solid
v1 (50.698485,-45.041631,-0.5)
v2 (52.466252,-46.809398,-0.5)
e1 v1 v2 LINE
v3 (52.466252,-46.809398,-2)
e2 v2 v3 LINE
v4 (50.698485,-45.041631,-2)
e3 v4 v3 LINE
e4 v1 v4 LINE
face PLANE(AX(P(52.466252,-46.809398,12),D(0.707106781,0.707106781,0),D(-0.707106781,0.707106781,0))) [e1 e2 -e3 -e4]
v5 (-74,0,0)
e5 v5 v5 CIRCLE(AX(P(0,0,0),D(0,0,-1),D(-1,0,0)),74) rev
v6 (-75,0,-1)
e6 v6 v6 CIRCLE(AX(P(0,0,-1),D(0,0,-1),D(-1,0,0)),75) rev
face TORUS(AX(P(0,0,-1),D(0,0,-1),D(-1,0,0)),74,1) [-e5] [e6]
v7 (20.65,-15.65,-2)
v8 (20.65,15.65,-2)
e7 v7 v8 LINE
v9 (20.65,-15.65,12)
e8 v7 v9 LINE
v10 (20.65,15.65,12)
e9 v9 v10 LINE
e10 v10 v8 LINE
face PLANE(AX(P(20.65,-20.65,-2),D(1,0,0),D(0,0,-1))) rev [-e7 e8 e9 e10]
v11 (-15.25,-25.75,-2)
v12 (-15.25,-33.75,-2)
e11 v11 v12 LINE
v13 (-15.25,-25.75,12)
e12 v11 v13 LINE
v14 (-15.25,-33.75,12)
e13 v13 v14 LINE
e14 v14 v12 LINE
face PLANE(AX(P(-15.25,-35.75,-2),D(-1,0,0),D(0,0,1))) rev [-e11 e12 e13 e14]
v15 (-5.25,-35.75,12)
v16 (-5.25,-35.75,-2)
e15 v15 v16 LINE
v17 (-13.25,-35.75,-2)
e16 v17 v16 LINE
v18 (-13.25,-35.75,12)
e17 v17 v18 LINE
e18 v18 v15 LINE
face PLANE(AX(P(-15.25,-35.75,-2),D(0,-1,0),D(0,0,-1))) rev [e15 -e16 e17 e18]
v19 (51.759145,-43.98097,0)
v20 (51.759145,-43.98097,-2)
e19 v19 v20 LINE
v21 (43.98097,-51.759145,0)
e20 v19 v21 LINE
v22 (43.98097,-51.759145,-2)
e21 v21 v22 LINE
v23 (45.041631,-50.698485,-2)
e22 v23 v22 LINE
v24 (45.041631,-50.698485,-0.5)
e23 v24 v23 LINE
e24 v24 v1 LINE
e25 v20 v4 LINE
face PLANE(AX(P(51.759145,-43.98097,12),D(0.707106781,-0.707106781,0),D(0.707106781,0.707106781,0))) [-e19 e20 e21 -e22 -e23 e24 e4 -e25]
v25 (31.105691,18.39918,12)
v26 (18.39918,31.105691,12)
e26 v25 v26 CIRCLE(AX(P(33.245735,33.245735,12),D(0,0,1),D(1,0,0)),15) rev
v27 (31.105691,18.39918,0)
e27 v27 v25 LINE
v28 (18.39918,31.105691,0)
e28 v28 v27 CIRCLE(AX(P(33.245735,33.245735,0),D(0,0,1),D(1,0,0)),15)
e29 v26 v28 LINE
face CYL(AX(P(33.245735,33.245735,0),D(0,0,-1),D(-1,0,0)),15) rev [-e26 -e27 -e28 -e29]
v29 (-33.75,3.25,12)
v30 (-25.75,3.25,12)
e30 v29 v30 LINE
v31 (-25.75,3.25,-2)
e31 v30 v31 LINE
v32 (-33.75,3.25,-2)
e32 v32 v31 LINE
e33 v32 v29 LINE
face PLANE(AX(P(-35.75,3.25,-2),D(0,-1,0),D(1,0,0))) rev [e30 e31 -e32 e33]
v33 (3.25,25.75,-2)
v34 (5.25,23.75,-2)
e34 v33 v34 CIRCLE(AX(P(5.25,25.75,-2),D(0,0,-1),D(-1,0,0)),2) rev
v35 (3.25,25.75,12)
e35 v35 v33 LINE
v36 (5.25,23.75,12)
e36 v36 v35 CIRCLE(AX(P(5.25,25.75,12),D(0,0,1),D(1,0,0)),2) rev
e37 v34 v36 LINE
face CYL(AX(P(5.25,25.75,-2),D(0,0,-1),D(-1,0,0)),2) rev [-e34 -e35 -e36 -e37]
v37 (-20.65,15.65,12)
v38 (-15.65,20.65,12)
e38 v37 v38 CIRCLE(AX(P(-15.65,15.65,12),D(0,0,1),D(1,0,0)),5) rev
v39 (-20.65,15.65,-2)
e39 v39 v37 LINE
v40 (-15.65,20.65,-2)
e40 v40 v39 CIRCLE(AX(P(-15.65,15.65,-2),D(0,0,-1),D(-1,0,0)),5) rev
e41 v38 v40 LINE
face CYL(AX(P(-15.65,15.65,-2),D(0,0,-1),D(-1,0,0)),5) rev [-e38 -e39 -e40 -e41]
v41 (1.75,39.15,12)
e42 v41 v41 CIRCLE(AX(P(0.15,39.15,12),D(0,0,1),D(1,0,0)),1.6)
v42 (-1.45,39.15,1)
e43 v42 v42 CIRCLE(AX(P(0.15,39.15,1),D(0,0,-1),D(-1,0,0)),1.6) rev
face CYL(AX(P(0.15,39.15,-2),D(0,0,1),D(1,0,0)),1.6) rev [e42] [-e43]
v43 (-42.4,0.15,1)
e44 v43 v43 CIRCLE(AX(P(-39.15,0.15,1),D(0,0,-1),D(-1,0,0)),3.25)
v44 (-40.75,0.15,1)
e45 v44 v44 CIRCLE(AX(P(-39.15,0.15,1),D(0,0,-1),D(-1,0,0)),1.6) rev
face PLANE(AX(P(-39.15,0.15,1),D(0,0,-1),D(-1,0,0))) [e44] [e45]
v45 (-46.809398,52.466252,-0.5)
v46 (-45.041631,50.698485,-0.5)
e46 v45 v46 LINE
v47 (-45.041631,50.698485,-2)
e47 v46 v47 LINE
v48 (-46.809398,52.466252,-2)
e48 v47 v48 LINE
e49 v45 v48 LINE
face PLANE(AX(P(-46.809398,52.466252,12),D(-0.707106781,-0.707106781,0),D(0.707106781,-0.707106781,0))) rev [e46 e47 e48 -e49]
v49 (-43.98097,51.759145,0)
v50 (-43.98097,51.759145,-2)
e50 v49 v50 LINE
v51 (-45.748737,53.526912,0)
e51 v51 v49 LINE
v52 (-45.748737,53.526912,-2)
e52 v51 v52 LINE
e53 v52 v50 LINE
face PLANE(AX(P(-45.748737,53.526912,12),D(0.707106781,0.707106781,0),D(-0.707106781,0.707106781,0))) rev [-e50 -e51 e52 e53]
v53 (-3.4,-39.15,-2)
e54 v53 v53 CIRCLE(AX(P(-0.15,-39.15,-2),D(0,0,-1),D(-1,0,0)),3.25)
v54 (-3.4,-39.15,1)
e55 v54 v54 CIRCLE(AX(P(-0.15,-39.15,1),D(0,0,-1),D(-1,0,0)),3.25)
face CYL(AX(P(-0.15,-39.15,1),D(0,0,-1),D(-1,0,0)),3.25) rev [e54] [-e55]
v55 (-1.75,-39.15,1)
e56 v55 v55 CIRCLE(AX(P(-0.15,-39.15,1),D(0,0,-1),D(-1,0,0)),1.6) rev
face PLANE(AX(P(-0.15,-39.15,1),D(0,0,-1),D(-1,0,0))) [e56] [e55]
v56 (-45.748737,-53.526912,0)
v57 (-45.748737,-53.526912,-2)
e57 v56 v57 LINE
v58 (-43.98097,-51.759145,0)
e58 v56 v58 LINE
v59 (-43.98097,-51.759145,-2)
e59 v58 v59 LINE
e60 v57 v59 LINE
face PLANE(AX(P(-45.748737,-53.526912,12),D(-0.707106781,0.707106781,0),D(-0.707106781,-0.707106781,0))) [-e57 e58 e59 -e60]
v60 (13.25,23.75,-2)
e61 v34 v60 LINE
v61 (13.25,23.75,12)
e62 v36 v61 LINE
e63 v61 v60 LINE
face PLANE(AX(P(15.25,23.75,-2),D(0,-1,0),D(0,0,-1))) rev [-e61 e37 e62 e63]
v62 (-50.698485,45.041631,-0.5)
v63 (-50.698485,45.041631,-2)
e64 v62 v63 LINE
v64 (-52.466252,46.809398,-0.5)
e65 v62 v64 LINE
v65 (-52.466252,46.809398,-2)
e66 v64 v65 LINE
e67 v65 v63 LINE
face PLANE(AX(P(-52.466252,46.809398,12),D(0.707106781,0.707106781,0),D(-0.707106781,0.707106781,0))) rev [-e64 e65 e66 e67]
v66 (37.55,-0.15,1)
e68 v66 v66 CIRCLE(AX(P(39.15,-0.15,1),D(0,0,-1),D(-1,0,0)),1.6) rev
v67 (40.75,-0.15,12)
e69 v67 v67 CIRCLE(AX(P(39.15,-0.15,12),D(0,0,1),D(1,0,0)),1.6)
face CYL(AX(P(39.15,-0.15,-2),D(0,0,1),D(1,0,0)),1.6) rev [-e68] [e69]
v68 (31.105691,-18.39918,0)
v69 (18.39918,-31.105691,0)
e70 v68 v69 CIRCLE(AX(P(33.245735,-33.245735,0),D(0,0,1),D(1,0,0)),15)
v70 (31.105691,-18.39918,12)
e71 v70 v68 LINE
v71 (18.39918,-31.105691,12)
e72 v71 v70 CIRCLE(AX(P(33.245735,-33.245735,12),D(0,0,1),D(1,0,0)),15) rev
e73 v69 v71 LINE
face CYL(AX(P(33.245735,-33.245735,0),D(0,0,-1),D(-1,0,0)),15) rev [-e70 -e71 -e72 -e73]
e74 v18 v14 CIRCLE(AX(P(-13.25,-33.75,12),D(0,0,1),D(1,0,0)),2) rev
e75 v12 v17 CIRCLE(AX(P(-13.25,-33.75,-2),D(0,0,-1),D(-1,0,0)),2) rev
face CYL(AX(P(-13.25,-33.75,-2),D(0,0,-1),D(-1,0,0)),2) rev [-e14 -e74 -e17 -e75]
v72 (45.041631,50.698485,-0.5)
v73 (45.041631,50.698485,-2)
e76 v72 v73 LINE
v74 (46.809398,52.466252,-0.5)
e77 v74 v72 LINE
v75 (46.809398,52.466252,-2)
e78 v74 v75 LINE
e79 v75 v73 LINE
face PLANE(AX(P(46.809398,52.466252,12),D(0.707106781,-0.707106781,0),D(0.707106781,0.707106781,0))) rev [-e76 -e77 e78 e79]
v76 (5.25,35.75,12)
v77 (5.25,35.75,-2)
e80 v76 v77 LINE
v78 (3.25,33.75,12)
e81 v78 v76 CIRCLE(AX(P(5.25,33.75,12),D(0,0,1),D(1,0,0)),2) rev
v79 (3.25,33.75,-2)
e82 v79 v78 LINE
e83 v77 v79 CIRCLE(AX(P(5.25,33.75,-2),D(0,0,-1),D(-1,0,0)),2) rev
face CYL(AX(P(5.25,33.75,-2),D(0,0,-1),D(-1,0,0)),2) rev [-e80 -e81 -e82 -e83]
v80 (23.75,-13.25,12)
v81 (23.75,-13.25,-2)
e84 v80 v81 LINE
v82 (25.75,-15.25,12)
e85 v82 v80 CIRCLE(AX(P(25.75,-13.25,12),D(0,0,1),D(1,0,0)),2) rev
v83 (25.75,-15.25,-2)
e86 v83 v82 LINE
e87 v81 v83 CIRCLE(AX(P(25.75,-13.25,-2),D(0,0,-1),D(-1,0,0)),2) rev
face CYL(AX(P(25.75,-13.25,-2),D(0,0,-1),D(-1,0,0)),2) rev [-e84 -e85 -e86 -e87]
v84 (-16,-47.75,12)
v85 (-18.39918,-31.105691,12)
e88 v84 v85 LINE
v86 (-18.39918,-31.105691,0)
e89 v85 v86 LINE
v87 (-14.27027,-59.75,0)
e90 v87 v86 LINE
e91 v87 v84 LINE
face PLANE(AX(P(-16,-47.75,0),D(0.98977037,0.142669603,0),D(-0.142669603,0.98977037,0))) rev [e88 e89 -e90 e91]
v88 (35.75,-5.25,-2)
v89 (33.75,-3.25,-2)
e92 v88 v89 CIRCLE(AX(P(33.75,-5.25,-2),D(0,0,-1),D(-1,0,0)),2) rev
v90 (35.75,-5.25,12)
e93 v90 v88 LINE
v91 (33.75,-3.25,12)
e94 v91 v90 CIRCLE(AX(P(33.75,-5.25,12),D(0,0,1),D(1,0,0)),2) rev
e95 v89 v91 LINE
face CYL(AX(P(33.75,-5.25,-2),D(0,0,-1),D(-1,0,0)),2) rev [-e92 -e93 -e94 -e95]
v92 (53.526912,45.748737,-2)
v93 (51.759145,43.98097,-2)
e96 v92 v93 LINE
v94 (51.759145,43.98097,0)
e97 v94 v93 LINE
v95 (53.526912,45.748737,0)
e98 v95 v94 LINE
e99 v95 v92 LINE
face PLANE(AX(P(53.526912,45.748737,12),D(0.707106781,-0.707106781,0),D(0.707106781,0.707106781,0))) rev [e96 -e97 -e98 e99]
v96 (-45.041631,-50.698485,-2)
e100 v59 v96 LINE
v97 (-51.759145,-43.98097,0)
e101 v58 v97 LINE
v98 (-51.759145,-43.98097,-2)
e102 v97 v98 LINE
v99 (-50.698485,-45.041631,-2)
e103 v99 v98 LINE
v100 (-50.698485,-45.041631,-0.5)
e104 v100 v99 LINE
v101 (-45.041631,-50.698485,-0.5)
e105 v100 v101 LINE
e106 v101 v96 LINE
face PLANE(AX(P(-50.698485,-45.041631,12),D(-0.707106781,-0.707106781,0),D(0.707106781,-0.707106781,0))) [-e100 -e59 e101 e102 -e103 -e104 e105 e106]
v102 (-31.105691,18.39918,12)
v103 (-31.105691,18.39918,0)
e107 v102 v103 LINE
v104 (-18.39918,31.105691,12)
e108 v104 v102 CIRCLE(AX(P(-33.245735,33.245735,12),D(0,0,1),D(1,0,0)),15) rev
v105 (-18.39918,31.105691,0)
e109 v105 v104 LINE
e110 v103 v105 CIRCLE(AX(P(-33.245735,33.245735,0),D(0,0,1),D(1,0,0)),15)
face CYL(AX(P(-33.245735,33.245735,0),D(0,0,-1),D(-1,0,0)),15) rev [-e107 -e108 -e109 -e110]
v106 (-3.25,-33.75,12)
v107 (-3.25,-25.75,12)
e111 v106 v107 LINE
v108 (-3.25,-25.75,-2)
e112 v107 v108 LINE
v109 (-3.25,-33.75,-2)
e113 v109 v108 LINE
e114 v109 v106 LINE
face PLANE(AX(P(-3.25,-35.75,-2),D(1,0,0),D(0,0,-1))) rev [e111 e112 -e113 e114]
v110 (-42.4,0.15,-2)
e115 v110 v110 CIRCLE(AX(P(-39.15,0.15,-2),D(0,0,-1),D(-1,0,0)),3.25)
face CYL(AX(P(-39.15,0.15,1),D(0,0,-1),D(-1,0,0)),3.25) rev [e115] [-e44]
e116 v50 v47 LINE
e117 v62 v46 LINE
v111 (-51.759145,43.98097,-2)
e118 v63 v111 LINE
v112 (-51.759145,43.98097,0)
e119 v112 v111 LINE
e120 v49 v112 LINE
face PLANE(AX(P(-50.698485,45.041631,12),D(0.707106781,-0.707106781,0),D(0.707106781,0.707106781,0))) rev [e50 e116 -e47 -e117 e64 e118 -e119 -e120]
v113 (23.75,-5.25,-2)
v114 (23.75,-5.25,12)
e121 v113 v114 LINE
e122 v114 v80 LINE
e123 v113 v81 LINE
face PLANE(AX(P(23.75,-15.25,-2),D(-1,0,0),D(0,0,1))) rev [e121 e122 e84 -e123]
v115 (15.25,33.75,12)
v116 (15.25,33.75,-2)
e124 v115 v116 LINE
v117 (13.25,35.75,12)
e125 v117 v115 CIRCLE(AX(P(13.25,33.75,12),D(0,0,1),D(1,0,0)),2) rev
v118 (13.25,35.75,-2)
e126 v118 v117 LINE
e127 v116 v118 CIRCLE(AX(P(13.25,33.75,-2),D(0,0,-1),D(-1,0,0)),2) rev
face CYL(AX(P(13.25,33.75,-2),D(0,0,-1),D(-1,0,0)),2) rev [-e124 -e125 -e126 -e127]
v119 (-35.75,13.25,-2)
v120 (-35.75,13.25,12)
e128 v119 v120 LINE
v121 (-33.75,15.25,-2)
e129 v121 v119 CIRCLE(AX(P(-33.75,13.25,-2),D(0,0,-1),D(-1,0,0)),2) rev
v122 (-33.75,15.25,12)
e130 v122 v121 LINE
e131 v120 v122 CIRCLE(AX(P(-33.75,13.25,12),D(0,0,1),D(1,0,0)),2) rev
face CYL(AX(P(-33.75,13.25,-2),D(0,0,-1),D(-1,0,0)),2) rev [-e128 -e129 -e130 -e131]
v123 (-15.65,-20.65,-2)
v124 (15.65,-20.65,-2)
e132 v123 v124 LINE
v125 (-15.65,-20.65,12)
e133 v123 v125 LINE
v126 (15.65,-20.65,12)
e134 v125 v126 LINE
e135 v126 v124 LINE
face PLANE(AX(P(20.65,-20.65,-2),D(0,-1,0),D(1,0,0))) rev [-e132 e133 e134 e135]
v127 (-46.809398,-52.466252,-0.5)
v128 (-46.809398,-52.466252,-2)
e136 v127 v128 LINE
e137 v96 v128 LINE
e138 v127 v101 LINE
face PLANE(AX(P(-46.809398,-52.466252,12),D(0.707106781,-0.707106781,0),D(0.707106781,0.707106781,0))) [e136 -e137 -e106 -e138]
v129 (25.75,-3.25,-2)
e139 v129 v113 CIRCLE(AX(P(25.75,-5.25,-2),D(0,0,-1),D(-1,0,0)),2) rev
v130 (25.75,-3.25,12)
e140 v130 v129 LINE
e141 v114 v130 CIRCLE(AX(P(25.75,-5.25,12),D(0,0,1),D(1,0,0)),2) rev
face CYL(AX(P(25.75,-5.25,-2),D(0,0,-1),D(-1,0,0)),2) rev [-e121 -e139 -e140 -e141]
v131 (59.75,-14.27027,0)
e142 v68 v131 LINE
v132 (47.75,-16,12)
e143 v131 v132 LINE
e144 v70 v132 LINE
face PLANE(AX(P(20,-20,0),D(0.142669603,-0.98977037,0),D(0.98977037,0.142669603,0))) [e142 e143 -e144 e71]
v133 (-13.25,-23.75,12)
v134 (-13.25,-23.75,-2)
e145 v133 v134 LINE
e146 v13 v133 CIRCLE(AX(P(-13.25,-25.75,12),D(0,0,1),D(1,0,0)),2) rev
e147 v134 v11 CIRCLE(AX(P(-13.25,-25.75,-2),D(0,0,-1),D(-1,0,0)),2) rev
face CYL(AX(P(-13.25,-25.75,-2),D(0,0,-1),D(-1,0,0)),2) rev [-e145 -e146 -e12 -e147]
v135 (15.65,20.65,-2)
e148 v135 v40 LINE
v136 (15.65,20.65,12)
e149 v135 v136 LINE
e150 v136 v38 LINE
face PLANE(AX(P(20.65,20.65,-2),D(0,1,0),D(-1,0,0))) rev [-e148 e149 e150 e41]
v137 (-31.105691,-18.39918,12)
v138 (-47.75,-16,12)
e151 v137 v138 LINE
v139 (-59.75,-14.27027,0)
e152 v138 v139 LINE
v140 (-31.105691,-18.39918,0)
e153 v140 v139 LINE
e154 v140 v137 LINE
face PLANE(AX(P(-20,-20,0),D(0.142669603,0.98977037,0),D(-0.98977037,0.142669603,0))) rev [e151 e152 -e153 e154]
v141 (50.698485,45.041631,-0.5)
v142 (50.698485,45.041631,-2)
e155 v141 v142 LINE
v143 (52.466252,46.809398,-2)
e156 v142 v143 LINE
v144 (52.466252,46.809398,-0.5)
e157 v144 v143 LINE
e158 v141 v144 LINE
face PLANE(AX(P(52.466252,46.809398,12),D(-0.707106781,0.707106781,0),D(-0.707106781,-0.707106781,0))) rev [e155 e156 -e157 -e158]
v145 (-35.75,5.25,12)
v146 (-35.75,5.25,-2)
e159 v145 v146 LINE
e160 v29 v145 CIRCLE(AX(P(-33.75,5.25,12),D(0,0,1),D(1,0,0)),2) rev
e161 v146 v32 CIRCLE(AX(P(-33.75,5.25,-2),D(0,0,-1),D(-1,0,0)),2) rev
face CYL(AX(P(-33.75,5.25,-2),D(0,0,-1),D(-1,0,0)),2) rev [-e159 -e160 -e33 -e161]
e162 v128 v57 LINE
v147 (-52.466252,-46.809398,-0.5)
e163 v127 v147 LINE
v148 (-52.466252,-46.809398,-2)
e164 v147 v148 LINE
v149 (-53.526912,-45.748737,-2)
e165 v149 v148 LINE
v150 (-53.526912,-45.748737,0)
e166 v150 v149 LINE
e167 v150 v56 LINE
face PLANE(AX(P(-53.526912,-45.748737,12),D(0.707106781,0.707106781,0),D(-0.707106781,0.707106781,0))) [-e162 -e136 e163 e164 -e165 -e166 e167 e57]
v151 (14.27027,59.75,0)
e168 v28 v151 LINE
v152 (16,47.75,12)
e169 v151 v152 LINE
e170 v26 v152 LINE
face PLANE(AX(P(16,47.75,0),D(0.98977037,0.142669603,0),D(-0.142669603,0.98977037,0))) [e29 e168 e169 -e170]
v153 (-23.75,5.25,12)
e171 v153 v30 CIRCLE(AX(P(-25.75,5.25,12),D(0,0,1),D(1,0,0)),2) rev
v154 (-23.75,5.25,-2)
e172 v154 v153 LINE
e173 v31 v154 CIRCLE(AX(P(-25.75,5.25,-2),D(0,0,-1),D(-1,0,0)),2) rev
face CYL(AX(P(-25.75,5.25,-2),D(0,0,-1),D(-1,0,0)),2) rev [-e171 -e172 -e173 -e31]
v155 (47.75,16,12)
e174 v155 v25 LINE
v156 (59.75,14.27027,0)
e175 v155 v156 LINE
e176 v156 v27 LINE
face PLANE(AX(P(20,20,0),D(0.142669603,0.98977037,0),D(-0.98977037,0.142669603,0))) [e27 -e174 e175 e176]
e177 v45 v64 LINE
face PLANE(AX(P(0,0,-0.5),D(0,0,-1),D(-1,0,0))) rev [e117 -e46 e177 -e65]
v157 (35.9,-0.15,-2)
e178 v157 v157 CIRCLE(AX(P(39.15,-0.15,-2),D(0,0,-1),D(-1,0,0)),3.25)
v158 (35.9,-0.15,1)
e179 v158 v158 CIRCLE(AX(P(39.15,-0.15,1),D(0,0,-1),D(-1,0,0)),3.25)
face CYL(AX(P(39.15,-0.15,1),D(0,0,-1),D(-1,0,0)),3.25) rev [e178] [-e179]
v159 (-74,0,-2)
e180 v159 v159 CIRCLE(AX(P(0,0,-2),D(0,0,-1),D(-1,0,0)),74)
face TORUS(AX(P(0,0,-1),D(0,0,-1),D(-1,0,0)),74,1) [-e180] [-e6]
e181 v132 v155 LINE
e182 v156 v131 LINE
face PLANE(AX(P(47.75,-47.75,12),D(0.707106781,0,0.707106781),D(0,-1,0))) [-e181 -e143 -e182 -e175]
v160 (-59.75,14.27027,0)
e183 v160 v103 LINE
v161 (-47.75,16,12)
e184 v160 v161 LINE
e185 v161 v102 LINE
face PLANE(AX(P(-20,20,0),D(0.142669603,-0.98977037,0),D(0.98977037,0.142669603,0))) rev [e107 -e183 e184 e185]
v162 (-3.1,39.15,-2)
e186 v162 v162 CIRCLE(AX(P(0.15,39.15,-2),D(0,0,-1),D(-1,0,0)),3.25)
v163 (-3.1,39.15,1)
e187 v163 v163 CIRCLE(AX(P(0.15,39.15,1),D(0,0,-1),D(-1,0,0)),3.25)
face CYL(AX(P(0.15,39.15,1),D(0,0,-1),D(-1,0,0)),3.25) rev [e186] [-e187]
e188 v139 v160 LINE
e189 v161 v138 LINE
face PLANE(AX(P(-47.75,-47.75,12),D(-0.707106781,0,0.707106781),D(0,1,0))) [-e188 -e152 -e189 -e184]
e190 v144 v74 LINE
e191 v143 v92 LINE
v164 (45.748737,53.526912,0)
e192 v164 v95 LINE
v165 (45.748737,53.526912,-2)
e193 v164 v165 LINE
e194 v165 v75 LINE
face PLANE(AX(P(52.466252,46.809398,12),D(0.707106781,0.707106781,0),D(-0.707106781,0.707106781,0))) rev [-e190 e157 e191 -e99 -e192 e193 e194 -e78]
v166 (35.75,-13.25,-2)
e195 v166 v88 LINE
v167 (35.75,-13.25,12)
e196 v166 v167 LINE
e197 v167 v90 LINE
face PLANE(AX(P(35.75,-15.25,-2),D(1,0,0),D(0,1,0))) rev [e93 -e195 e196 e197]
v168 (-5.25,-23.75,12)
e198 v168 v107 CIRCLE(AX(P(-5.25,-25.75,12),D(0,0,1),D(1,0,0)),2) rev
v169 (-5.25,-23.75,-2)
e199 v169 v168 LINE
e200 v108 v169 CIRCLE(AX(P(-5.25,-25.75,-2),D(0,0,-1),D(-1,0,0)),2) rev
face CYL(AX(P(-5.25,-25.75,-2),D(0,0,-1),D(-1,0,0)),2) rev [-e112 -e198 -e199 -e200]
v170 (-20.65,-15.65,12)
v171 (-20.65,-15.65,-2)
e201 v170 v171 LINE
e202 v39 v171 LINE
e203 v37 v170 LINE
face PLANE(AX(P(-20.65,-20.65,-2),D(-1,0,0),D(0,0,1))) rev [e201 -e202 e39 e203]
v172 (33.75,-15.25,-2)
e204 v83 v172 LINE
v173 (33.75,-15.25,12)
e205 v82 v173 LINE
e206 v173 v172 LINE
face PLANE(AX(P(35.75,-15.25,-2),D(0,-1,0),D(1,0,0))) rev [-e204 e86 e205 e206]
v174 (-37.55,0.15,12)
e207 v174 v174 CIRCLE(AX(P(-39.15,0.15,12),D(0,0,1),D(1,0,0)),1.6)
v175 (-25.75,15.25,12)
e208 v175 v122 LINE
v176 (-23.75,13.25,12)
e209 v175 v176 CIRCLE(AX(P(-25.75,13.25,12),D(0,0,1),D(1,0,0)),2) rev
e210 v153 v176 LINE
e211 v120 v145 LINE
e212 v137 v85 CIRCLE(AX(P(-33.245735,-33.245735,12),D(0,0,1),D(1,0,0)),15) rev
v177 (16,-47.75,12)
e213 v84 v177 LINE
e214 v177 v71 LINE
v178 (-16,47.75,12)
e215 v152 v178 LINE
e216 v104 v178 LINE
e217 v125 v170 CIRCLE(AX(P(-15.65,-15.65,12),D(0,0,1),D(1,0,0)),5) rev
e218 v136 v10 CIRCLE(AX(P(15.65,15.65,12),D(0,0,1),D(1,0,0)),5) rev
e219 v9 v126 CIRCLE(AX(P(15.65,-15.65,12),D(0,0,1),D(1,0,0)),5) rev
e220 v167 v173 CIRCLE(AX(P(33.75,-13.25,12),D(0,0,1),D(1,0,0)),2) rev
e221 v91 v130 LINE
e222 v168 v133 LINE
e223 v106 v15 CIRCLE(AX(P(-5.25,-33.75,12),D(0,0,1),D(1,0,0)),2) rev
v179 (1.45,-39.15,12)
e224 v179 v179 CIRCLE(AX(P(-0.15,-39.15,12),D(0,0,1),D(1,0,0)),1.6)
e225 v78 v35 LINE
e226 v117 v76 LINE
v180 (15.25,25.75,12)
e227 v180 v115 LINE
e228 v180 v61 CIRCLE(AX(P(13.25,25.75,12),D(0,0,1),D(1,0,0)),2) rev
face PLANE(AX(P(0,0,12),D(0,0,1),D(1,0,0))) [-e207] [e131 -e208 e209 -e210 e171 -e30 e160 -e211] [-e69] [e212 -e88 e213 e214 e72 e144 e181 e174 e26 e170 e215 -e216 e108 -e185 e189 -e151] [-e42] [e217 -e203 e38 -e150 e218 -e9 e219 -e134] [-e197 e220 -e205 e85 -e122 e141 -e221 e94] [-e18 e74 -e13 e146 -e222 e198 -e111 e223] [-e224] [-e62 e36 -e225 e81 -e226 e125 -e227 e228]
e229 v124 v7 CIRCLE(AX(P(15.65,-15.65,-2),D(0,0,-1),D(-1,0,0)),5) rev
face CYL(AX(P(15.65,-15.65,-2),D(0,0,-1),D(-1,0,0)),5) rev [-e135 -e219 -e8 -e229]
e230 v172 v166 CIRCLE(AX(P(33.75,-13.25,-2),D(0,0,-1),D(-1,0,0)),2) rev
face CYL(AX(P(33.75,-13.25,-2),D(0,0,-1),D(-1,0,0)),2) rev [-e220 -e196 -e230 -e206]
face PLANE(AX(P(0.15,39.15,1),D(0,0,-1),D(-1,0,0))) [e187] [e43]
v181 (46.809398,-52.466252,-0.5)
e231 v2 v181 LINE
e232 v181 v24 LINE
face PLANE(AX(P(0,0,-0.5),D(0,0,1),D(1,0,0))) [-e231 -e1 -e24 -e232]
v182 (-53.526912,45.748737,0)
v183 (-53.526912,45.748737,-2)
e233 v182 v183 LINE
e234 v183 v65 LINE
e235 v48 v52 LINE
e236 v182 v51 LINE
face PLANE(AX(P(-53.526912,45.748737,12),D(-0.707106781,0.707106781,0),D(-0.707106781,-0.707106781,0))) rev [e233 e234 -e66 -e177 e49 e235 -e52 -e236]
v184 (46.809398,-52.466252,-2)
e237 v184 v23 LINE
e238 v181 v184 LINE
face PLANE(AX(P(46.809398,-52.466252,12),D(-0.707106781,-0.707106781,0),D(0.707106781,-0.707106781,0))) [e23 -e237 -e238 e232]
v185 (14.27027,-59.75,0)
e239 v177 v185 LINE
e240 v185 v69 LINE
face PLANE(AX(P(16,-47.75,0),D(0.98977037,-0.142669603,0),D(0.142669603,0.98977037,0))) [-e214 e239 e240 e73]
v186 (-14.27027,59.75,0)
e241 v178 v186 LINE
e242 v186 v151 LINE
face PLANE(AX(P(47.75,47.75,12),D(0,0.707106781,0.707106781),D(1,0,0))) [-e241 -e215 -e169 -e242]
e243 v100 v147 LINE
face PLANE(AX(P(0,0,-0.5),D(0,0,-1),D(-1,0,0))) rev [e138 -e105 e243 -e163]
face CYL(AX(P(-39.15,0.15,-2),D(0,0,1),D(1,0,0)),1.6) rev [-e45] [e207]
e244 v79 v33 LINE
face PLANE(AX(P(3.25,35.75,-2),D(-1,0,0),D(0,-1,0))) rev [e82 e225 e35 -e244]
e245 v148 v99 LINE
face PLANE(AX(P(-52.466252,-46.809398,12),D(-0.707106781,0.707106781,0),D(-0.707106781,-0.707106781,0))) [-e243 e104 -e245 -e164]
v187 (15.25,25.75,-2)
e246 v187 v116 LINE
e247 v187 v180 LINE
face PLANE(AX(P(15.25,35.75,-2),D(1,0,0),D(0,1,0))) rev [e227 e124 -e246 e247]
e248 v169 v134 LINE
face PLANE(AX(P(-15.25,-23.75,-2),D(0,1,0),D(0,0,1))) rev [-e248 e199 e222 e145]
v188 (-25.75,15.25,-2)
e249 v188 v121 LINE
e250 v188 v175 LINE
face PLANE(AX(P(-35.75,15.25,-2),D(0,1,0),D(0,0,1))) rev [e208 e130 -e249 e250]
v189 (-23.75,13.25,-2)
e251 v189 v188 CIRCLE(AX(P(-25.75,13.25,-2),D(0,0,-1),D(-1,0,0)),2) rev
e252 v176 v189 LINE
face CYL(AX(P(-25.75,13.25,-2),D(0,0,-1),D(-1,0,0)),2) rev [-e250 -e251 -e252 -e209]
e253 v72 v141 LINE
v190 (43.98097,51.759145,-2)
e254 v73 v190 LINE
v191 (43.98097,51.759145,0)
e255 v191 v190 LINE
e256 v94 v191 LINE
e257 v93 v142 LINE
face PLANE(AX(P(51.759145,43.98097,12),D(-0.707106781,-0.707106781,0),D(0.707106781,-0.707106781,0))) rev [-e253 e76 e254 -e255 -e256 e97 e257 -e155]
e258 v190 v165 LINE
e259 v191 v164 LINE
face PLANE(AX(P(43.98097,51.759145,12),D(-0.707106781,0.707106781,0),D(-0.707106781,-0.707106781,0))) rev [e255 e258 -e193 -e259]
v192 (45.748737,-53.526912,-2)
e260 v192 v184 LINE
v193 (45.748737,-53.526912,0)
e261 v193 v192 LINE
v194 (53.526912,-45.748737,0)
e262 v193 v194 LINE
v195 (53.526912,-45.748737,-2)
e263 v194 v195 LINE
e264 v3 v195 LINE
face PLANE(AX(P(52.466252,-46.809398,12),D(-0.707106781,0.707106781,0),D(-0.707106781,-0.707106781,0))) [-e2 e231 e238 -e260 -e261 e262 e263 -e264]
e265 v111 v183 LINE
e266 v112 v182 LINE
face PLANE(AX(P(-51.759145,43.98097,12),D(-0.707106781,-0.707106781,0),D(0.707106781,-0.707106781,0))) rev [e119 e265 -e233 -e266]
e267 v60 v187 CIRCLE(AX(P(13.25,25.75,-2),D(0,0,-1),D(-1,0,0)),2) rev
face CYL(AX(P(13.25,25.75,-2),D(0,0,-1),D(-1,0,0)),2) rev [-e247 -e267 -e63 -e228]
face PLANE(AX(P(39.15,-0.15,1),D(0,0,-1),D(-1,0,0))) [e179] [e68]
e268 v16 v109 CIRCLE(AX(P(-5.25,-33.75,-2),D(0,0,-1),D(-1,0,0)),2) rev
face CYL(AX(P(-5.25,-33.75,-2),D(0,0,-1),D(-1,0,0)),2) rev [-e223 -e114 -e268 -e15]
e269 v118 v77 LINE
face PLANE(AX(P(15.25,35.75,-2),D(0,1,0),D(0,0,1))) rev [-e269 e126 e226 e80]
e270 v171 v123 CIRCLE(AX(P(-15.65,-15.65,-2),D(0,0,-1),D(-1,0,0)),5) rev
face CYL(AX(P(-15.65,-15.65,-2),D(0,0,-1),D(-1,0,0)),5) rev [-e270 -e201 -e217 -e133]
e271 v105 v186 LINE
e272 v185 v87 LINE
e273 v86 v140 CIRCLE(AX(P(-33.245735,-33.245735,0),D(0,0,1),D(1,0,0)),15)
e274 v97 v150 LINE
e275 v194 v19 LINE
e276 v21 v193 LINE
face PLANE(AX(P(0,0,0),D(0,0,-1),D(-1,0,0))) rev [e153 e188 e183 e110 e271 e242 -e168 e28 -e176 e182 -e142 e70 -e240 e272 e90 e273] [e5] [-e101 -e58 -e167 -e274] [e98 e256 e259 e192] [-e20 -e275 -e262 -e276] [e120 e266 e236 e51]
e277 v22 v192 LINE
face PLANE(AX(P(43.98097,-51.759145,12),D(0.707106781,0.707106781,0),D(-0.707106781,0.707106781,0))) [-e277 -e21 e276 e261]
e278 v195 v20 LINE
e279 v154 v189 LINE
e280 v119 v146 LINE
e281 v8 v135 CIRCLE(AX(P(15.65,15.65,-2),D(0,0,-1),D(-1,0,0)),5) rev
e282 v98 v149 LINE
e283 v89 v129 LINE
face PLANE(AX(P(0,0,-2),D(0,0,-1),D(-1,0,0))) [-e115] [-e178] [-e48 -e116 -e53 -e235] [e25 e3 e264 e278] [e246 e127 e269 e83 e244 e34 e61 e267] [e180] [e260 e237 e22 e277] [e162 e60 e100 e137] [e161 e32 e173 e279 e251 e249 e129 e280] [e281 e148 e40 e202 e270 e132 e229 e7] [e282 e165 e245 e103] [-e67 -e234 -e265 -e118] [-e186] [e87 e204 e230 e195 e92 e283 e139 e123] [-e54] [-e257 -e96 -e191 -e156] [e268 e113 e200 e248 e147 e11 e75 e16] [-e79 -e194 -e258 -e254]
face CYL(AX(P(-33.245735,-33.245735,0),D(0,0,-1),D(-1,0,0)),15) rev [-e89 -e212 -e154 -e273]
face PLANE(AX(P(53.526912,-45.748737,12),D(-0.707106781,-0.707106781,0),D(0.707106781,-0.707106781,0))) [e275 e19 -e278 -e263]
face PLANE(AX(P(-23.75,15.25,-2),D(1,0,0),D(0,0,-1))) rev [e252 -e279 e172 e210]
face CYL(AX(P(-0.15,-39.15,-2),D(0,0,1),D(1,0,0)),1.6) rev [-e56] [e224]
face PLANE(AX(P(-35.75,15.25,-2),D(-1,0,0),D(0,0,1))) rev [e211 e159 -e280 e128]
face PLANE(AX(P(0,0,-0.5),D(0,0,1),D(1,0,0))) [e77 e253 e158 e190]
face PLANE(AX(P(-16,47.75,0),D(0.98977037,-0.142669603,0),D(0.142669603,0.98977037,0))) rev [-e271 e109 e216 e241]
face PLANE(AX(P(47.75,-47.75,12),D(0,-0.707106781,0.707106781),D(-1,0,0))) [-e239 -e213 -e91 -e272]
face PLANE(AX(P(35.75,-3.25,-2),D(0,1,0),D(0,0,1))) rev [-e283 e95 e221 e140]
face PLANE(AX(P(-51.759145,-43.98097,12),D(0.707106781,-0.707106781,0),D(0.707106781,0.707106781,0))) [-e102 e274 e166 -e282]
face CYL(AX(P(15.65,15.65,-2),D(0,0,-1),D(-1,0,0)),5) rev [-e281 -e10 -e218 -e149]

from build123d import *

# Parameters (mm, degrees)
SKETCH_1_W          = 95.5
SKETCH_1_H          = 95.5
EXTRUDE_1_DEPTH     = 12
CUT_EXTRUDE_1_DEPTH = 69.58662406
FILLET_2_R          = 15
SKETCH_3_R          = 75
EXTRUDE_2_DEPTH     = 2
CHAMFER_1_SIZE      = 12
FILLET_1_R          = 1
SKETCH_6_W          = 42
SKETCH_6_H          = 42
CUT_EXTRUDE_3_DEPTH = 107.98598046
SKETCH_7_R          = 1.6
CUT_EXTRUDE_4_DEPTH = 107.98598046
CUT_EXTRUDE_5_DEPTH = 107.98598046
CUT_EXTRUDE_6_DEPTH = 0.5
SKETCH_10_W         = 12
SKETCH_10_H         = 12
CUT_EXTRUDE_7_DEPTH = 107.98598046
SKETCH_11_W         = 42
SKETCH_11_H         = 42
EXTRUDE_3_DEPTH     = 14
FILLET_3_R          = 2
SKETCH_12_W         = 41.3
SKETCH_12_H         = 41.3
CUT_EXTRUDE_8_DEPTH = 107.98598046
FILLET_4_R          = 5
SKETCH_13_R         = 3.25
CUT_EXTRUDE_9_DEPTH = 3


with BuildPart() as part:
    # ｽｹｯﾁ1 → ﾎﾞｽ - 押し出し1 (new body)
    with BuildSketch(Plane.XY):
        Rectangle(SKETCH_1_W, SKETCH_1_H)
    extrude(amount=EXTRUDE_1_DEPTH)

    # ｽｹｯﾁ2 → ｶｯﾄ - 押し出し1 (cut, through all)
    with BuildSketch(Plane.XY.offset(12)):
        Polygon((-16, 47.75), (-20, 20), (-47.75, 16), (-47.75, 47.75), align=None)
        Polygon((-16, -47.75), (-20, -20), (-47.75, -16), (-47.75, -47.75), align=None)
    cut_extrude_1 = extrude(amount=-CUT_EXTRUDE_1_DEPTH, mode=Mode.SUBTRACT)

    # ﾐﾗｰ1: ｶｯﾄ - 押し出し1 across plane
    add(cut_extrude_1.mirror(Plane(origin=(0, 0, 0), x_dir=(0, 0, 1), z_dir=(1, 0, 0))), mode=Mode.SUBTRACT)

    # ﾌｨﾚｯﾄ2
    fillet_2_edges = [part.edges().sort_by_distance(p)[0] for p in [
        (-20, 20, 6),
        (-20, -20, 6),
        (20, 20, 6),
        (20, -20, 6),
    ]]
    fillet(fillet_2_edges, radius=FILLET_2_R)

    # ｽｹｯﾁ3 → ﾎﾞｽ - 押し出し2 (add)
    with BuildSketch(Plane(origin=(0, 0, 0), x_dir=(-1, 0, 0), z_dir=(0, 0, -1))):
        Circle(SKETCH_3_R)
    extrude(amount=EXTRUDE_2_DEPTH)

    # 面取り1
    chamfer_1_edges = [part.edges().sort_by_distance(p)[0] for p in [
        (0, 47.75, 0),
        (47.75, 0, 0),
        (0, -47.75, 0),
        (-47.75, 0, 0),
    ]]
    chamfer(chamfer_1_edges, length=CHAMFER_1_SIZE - 0.0001)  # a hair under: the kernel refuses the full size

    # ﾌｨﾚｯﾄ1
    fillet_1_edges = [part.edges().sort_by_distance(p)[0] for p in [
        (75, 0, 0),
        (75, 0, -2),
    ]]
    fillet(fillet_1_edges, radius=FILLET_1_R - 0.0001)  # a hair under: the kernel refuses the full size

    # ｽｹｯﾁ6 → ｶｯﾄ - 押し出し3 (cut, through all)
    with BuildSketch(Plane.XY.offset(12)):
        Rectangle(SKETCH_6_W, SKETCH_6_H)
    extrude(amount=-CUT_EXTRUDE_3_DEPTH, mode=Mode.SUBTRACT)

    # ｽｹｯﾁ7 → ｶｯﾄ - 押し出し4 (cut, through all)
    with BuildSketch(Plane.XY.offset(12)):
        with Locations((0.15, 39.15)):
            Circle(SKETCH_7_R)
        with Locations((-39.15, 0.15)):
            Circle(SKETCH_7_R)
        with Locations((39.15, -0.15)):
            Circle(SKETCH_7_R)
        with Locations((-0.15, -39.15)):
            Circle(SKETCH_7_R)
    extrude(amount=-CUT_EXTRUDE_4_DEPTH, mode=Mode.SUBTRACT)

    # ｽｹｯﾁ8 → ｶｯﾄ - 押し出し5 (cut, through all)
    with BuildSketch(Plane(origin=(0, 0, -2), x_dir=(-1, 0, 0), z_dir=(0, 0, -1))):
        Polygon((-45.748737342, 53.526911935), (-46.809397513, 52.466251763), (-45.04163056, 50.69848481), (-43.980970389, 51.759144982), align=None)
        Polygon((-53.526911935, 45.748737342), (-51.759144982, 43.980970389), (-50.69848481, 45.04163056), (-52.466251763, 46.809397513), align=None)
        Polygon((43.980970389, 51.759144982), (45.04163056, 50.69848481), (46.809397513, 52.466251763), (45.748737342, 53.526911935), align=None)
        Polygon((51.759144982, 43.980970389), (53.526911935, 45.748737342), (52.466251763, 46.809397513), (50.69848481, 45.04163056), align=None)
    cut_extrude_5 = extrude(amount=-CUT_EXTRUDE_5_DEPTH, mode=Mode.SUBTRACT)

    # ｽｹｯﾁ9 → ｶｯﾄ - 押し出し6 (cut)
    with BuildSketch(Plane.XY):
        Polygon((-53.526911935, 45.748737342), (-45.748737342, 53.526911935), (-43.980970389, 51.759144982), (-51.759144982, 43.980970389), align=None)
        Polygon((43.980970389, 51.759144982), (51.759144982, 43.980970389), (53.526911935, 45.748737342), (45.748737342, 53.526911935), align=None)
    cut_extrude_6 = extrude(amount=-CUT_EXTRUDE_6_DEPTH, mode=Mode.SUBTRACT)

    # ﾐﾗｰ2: ｶｯﾄ - 押し出し5, ｶｯﾄ - 押し出し6 across plane
    add(cut_extrude_5.mirror(Plane.ZX), mode=Mode.SUBTRACT)
    add(cut_extrude_6.mirror(Plane.ZX), mode=Mode.SUBTRACT)

    # ｽｹｯﾁ10 → ｶｯﾄ - 押し出し7 (cut, through all)
    with BuildSketch(Plane.XY.offset(12)):
        with Locations((-29.75, 9.25)):
            Rectangle(SKETCH_10_W, SKETCH_10_H)
        with Locations((-9.25, -29.75)):
            Rectangle(SKETCH_10_W, SKETCH_10_H)
        with Locations((29.75, -9.25)):
            Rectangle(SKETCH_10_W, SKETCH_10_H)
        with Locations((9.25, 29.75)):
            Rectangle(SKETCH_10_W, SKETCH_10_H)
    extrude(amount=-CUT_EXTRUDE_7_DEPTH, mode=Mode.SUBTRACT)

    # ｽｹｯﾁ11 → ﾎﾞｽ - 押し出し3 (add, through all)
    with BuildSketch(Plane(origin=(0, 0, -2), x_dir=(-1, 0, 0), z_dir=(0, 0, -1))):
        Rectangle(SKETCH_11_W, SKETCH_11_H)
    extrude(amount=-EXTRUDE_3_DEPTH)

    # ﾌｨﾚｯﾄ3
    fillet_3_edges = [part.edges().sort_by_distance(p)[0] for p in [
        (-35.75, 3.25, 5),
        (-35.75, 15.25, 5),
        (-23.75, 15.25, 5),
        (-23.75, 3.25, 5),
        (-15.25, -35.75, 5),
        (-15.25, -23.75, 5),
        (-3.25, -23.75, 5),
        (-3.25, -35.75, 5),
        (35.75, -3.25, 5),
        (35.75, -15.25, 5),
        (23.75, -15.25, 5),
        (23.75, -3.25, 5),
        (15.25, 35.75, 5),
        (15.25, 23.75, 5),
        (3.25, 23.75, 5),
        (3.25, 35.75, 5),
    ]]
    fillet(fillet_3_edges, radius=FILLET_3_R)

    # ｽｹｯﾁ12 → ｶｯﾄ - 押し出し8 (cut, through all)
    with BuildSketch(Plane.XY.offset(12)):
        Rectangle(SKETCH_12_W, SKETCH_12_H)
    extrude(amount=-CUT_EXTRUDE_8_DEPTH, mode=Mode.SUBTRACT)

    # ﾌｨﾚｯﾄ4
    fillet_4_edges = [part.edges().sort_by_distance(p)[0] for p in [
        (-20.65, -20.65, 5),
        (-20.65, 20.65, 5),
        (20.65, 20.65, 5),
        (20.65, -20.65, 5),
    ]]
    fillet(fillet_4_edges, radius=FILLET_4_R)

    # ｽｹｯﾁ13 → ｶｯﾄ - 押し出し9 (cut)
    with BuildSketch(Plane(origin=(0, 0, -2), x_dir=(-1, 0, 0), z_dir=(0, 0, -1))):
        with Locations((-0.15, 39.15)):
            Circle(SKETCH_13_R)
        with Locations((39.15, 0.15)):
            Circle(SKETCH_13_R)
        with Locations((-39.15, -0.15)):
            Circle(SKETCH_13_R)
        with Locations((0.15, -39.15)):
            Circle(SKETCH_13_R)
    extrude(amount=-CUT_EXTRUDE_9_DEPTH, mode=Mode.SUBTRACT)


solid = part.part
